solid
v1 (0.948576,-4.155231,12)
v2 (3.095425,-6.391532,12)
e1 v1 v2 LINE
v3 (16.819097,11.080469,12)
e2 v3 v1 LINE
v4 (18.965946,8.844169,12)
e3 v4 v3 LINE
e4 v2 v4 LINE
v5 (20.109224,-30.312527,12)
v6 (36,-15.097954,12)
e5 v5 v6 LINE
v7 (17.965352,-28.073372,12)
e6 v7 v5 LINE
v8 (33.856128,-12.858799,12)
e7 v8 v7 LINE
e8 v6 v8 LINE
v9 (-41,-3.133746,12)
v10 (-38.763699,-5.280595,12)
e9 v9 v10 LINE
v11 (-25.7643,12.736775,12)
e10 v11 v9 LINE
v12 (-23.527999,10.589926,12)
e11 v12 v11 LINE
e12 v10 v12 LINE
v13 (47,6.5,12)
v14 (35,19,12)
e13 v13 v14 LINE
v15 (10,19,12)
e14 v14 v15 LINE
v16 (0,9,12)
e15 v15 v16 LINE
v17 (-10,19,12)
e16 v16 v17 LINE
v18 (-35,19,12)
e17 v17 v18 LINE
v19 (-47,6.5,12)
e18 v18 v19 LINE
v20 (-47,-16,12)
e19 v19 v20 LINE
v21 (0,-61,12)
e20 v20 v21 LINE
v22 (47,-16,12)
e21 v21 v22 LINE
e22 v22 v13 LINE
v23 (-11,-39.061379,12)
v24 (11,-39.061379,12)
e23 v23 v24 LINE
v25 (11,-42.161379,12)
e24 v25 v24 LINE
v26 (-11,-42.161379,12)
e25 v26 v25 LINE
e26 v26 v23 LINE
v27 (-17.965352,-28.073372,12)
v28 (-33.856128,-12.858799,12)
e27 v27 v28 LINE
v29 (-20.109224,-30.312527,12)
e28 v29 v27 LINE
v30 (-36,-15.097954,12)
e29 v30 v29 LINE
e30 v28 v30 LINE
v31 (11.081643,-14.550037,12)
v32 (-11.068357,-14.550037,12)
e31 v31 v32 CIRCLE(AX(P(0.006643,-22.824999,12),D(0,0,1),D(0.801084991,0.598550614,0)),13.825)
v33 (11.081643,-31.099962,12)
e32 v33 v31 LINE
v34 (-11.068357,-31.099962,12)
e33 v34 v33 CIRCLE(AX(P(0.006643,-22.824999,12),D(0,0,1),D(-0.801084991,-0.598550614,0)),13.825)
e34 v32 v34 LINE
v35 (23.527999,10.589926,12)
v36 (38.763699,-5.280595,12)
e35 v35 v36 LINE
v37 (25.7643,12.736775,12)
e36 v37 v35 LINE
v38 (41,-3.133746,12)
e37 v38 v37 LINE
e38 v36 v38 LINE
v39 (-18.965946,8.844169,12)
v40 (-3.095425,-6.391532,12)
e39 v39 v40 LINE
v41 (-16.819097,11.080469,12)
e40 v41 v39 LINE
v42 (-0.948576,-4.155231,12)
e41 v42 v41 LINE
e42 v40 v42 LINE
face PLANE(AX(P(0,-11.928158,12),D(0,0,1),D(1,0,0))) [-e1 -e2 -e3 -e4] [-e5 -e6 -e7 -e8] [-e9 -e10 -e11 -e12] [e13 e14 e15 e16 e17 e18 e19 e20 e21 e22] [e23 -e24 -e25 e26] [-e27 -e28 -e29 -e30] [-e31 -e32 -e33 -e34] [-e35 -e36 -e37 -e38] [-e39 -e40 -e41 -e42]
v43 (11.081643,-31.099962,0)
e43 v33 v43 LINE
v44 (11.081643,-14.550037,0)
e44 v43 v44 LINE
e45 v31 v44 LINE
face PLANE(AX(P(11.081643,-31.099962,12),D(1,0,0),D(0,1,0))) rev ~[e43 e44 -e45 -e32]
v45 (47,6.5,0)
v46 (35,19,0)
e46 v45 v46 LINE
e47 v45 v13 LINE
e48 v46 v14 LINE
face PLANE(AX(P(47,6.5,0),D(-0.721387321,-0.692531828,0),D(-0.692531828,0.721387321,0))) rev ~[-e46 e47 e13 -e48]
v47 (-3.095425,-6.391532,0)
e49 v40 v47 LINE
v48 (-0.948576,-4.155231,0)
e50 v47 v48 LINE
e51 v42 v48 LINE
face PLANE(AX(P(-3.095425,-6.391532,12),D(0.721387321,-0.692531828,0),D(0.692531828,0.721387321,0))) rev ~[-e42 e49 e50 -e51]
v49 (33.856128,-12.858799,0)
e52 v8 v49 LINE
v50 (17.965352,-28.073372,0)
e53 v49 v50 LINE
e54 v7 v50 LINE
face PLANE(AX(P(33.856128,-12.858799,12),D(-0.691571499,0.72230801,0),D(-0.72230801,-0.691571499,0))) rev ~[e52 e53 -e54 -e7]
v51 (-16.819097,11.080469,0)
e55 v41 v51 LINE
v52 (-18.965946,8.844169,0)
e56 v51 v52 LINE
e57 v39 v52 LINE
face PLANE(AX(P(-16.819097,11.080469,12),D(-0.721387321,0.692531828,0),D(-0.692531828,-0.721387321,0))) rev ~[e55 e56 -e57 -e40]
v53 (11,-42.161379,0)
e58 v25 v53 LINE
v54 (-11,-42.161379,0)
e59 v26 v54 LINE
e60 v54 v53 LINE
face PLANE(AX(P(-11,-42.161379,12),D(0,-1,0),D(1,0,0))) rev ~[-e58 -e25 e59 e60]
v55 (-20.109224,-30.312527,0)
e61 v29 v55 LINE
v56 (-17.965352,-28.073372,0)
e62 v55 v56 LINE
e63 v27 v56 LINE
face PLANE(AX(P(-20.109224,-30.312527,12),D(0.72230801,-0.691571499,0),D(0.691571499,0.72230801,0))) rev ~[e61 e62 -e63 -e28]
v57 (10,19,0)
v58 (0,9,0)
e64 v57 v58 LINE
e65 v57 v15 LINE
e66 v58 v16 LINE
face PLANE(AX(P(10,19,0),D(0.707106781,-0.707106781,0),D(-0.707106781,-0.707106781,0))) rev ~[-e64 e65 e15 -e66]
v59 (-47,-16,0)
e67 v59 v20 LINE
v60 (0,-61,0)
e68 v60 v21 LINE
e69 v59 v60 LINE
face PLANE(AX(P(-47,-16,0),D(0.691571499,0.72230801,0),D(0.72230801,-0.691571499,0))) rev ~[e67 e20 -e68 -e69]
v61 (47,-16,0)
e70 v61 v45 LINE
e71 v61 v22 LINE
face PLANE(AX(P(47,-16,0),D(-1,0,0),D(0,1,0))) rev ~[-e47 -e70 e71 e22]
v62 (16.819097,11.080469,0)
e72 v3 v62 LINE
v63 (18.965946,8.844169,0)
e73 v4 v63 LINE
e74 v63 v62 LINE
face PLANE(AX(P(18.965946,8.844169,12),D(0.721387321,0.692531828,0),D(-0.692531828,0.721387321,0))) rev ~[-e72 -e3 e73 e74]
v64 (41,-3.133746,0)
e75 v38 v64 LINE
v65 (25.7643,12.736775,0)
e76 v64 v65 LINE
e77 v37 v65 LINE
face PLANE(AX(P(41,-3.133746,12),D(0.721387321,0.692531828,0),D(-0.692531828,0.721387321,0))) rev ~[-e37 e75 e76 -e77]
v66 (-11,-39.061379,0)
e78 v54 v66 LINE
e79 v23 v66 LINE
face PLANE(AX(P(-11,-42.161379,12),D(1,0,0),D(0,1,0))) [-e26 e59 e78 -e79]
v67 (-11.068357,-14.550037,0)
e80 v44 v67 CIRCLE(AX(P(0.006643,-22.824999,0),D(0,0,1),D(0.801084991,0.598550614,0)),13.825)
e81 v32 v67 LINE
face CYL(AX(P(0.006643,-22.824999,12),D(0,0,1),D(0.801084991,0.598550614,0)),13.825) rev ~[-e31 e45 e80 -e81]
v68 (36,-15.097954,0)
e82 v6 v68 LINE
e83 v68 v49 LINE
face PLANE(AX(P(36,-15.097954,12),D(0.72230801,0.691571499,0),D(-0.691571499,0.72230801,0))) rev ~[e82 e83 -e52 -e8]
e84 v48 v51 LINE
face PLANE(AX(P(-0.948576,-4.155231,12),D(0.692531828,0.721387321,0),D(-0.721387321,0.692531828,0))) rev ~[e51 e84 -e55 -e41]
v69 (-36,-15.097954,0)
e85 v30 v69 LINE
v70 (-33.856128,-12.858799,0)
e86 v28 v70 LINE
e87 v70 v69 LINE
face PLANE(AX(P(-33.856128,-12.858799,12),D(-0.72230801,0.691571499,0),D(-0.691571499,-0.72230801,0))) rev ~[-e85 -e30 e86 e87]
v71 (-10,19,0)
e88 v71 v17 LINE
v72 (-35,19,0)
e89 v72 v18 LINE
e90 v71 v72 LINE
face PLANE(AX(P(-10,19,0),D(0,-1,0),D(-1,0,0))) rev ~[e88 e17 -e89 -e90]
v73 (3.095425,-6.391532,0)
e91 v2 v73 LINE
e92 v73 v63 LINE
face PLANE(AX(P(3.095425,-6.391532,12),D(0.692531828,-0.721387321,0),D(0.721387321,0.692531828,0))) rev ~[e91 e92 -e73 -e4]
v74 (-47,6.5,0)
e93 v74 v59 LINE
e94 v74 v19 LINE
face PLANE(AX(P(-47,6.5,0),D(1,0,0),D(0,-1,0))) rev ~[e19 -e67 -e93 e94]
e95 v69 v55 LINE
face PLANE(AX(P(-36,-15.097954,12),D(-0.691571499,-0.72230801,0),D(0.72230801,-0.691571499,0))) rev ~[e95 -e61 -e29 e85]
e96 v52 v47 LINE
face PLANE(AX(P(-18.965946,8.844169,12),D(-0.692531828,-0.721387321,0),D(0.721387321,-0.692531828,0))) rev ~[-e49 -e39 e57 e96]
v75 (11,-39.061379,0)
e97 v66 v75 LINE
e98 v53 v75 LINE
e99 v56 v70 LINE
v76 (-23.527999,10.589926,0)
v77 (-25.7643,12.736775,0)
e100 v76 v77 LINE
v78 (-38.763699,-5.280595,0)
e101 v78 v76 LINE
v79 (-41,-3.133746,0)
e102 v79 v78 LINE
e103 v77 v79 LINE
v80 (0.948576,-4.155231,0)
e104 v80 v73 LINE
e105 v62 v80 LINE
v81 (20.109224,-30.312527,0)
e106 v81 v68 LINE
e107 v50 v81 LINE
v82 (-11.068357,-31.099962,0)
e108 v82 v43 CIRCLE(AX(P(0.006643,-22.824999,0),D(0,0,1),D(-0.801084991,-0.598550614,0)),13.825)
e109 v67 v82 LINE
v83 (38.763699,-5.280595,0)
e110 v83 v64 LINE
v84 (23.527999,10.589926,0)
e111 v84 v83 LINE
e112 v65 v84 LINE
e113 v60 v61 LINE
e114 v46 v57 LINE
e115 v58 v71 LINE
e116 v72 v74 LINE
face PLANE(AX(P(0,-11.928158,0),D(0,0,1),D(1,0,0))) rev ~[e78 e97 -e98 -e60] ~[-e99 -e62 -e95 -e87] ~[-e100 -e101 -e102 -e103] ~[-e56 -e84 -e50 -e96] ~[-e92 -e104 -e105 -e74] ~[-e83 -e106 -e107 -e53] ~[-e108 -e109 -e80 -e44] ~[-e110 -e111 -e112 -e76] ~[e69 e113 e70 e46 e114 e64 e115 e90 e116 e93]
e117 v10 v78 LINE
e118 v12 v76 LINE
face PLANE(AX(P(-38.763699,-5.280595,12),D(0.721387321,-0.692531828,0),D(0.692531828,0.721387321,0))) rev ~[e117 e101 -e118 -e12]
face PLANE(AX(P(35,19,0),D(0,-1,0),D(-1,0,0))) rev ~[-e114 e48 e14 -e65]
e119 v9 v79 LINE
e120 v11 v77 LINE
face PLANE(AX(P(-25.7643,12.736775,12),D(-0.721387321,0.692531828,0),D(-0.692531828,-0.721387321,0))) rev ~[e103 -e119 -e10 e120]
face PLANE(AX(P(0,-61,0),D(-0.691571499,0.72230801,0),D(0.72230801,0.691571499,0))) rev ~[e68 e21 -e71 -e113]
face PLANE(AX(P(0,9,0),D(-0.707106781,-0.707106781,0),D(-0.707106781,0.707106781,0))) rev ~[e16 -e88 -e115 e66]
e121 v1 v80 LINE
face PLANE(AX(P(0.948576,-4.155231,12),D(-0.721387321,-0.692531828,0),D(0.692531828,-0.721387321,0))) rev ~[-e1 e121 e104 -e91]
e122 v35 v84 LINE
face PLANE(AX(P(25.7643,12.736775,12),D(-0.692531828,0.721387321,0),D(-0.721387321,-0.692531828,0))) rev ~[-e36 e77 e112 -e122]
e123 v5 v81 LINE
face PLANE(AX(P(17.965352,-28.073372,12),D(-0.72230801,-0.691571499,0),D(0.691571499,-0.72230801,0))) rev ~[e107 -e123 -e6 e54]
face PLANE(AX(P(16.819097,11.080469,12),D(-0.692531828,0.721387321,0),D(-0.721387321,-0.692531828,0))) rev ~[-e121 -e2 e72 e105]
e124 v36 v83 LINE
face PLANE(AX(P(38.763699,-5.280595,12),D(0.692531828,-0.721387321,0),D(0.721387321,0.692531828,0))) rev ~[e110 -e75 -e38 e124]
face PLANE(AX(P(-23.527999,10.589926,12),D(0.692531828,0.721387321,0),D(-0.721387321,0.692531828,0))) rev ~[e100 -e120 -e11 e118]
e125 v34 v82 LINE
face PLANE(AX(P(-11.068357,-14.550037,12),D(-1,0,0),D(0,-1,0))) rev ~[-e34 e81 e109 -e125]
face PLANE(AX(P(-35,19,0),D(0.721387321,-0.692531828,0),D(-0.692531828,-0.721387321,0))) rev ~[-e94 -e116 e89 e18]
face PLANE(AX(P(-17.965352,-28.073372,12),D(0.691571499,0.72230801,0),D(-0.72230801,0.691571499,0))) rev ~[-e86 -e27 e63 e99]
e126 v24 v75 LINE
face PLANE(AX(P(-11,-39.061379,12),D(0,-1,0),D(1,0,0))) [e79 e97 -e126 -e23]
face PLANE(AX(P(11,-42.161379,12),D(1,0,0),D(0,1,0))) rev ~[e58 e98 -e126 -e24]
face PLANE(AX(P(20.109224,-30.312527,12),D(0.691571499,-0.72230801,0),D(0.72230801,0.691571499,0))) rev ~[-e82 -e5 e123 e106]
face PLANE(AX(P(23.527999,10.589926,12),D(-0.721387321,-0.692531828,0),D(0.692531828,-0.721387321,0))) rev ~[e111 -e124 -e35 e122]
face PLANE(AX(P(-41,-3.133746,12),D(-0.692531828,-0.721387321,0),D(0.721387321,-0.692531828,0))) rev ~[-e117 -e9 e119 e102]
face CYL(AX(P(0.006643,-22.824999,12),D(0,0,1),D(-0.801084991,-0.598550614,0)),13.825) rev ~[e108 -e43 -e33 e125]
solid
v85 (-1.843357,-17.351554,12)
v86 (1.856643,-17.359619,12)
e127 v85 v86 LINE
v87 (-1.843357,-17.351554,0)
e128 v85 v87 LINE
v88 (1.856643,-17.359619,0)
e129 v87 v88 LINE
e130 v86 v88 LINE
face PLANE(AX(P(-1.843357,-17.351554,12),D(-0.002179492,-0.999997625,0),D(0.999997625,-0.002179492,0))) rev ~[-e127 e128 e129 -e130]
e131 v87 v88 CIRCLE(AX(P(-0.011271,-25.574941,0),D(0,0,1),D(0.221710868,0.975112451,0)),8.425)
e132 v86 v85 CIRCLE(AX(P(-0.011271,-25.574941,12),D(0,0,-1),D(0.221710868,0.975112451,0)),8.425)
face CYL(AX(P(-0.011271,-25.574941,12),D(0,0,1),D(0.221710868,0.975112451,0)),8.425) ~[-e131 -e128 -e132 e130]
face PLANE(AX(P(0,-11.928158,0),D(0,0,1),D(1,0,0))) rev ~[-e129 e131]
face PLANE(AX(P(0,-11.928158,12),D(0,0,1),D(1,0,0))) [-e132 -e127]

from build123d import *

# Parameters (mm, degrees)
F1_DEPTH = 12
F2_W     = 22
F2_H     = 3.1
F3_DEPTH = 25


# Not quite as in the source:
# - a feature names something its author has since deleted; it is built from what else it names


with BuildPart() as f1:
    # F0 (on Top) → F1 (new body)
    with BuildSketch(Plane.XY):
        Polygon((-47, -16), (0, -61), (47, -16), (47, 6.5), (35, 19), (10, 19), (0, 9), (-10, 19), (-35, 19), (-47, 6.5), align=None)
    extrude(amount=F1_DEPTH)

    # F2 (on face) → F3 (cut)
    with BuildSketch(Plane.XY.offset(12)):
        Polygon((38.7636993048, -5.2805951643), (41, -3.1337464969), (25.7642997798, 12.7367745658), (23.5279990846, 10.5899258984), align=None)
        Polygon((17.9653521283, -28.0733723465), (20.1092237756, -30.3125271781), (36, -15.0979541973), (33.8561283527, -12.8587993657), align=None)
        with Locations((0, -40.611379497)):
            Rectangle(F2_W, F2_H)
        Polygon((-17.9653521283, -28.0733723465), (-33.8561283527, -12.8587993657), (-36, -15.0979541973), (-20.1092237756, -30.3125271781), align=None)
        Polygon((3.0954246037, -6.3915316387), (18.9659456664, 8.8441685815), (16.819096999, 11.0804692767), (0.9485759364, -4.1552309435), align=None)
        Polygon((-18.9659456664, 8.8441685815), (-3.0954246037, -6.3915316387), (-0.9485759364, -4.1552309435), (-16.819096999, 11.0804692767), align=None)
        Polygon((-38.7636993048, -5.2805951643), (-23.5279990846, 10.5899258984), (-25.7642997798, 12.7367745658), (-41, -3.1337464969), align=None)
        with BuildLine():
            Line((-11.0683567197, -14.5500370711), (-11.0683567197, -31.0999615422))
            ThreePointArc((-11.0683567197, -31.0999615422), (0.0066432803, -36.6499993066), (11.0816432803, -31.0999615422))
            Line((11.0816432803, -31.0999615422), (11.0816432803, -14.5500370711))
            ThreePointArc((11.0816432803, -14.5500370711), (0.0066432803, -8.9999993066), (-11.0683567197, -14.5500370711))
        make_face()
        with BuildLine():
            ThreePointArc((1.8566432803, -17.3596185624), (-0.0296329992, -33.9999209479), (-1.8433567197, -17.3515544229))
            Line((-1.8433567197, -17.3515544229), (1.8566432803, -17.3596185624))
        make_face(mode=Mode.SUBTRACT)
    extrude(amount=-F3_DEPTH, mode=Mode.SUBTRACT)


solid = f1.part
